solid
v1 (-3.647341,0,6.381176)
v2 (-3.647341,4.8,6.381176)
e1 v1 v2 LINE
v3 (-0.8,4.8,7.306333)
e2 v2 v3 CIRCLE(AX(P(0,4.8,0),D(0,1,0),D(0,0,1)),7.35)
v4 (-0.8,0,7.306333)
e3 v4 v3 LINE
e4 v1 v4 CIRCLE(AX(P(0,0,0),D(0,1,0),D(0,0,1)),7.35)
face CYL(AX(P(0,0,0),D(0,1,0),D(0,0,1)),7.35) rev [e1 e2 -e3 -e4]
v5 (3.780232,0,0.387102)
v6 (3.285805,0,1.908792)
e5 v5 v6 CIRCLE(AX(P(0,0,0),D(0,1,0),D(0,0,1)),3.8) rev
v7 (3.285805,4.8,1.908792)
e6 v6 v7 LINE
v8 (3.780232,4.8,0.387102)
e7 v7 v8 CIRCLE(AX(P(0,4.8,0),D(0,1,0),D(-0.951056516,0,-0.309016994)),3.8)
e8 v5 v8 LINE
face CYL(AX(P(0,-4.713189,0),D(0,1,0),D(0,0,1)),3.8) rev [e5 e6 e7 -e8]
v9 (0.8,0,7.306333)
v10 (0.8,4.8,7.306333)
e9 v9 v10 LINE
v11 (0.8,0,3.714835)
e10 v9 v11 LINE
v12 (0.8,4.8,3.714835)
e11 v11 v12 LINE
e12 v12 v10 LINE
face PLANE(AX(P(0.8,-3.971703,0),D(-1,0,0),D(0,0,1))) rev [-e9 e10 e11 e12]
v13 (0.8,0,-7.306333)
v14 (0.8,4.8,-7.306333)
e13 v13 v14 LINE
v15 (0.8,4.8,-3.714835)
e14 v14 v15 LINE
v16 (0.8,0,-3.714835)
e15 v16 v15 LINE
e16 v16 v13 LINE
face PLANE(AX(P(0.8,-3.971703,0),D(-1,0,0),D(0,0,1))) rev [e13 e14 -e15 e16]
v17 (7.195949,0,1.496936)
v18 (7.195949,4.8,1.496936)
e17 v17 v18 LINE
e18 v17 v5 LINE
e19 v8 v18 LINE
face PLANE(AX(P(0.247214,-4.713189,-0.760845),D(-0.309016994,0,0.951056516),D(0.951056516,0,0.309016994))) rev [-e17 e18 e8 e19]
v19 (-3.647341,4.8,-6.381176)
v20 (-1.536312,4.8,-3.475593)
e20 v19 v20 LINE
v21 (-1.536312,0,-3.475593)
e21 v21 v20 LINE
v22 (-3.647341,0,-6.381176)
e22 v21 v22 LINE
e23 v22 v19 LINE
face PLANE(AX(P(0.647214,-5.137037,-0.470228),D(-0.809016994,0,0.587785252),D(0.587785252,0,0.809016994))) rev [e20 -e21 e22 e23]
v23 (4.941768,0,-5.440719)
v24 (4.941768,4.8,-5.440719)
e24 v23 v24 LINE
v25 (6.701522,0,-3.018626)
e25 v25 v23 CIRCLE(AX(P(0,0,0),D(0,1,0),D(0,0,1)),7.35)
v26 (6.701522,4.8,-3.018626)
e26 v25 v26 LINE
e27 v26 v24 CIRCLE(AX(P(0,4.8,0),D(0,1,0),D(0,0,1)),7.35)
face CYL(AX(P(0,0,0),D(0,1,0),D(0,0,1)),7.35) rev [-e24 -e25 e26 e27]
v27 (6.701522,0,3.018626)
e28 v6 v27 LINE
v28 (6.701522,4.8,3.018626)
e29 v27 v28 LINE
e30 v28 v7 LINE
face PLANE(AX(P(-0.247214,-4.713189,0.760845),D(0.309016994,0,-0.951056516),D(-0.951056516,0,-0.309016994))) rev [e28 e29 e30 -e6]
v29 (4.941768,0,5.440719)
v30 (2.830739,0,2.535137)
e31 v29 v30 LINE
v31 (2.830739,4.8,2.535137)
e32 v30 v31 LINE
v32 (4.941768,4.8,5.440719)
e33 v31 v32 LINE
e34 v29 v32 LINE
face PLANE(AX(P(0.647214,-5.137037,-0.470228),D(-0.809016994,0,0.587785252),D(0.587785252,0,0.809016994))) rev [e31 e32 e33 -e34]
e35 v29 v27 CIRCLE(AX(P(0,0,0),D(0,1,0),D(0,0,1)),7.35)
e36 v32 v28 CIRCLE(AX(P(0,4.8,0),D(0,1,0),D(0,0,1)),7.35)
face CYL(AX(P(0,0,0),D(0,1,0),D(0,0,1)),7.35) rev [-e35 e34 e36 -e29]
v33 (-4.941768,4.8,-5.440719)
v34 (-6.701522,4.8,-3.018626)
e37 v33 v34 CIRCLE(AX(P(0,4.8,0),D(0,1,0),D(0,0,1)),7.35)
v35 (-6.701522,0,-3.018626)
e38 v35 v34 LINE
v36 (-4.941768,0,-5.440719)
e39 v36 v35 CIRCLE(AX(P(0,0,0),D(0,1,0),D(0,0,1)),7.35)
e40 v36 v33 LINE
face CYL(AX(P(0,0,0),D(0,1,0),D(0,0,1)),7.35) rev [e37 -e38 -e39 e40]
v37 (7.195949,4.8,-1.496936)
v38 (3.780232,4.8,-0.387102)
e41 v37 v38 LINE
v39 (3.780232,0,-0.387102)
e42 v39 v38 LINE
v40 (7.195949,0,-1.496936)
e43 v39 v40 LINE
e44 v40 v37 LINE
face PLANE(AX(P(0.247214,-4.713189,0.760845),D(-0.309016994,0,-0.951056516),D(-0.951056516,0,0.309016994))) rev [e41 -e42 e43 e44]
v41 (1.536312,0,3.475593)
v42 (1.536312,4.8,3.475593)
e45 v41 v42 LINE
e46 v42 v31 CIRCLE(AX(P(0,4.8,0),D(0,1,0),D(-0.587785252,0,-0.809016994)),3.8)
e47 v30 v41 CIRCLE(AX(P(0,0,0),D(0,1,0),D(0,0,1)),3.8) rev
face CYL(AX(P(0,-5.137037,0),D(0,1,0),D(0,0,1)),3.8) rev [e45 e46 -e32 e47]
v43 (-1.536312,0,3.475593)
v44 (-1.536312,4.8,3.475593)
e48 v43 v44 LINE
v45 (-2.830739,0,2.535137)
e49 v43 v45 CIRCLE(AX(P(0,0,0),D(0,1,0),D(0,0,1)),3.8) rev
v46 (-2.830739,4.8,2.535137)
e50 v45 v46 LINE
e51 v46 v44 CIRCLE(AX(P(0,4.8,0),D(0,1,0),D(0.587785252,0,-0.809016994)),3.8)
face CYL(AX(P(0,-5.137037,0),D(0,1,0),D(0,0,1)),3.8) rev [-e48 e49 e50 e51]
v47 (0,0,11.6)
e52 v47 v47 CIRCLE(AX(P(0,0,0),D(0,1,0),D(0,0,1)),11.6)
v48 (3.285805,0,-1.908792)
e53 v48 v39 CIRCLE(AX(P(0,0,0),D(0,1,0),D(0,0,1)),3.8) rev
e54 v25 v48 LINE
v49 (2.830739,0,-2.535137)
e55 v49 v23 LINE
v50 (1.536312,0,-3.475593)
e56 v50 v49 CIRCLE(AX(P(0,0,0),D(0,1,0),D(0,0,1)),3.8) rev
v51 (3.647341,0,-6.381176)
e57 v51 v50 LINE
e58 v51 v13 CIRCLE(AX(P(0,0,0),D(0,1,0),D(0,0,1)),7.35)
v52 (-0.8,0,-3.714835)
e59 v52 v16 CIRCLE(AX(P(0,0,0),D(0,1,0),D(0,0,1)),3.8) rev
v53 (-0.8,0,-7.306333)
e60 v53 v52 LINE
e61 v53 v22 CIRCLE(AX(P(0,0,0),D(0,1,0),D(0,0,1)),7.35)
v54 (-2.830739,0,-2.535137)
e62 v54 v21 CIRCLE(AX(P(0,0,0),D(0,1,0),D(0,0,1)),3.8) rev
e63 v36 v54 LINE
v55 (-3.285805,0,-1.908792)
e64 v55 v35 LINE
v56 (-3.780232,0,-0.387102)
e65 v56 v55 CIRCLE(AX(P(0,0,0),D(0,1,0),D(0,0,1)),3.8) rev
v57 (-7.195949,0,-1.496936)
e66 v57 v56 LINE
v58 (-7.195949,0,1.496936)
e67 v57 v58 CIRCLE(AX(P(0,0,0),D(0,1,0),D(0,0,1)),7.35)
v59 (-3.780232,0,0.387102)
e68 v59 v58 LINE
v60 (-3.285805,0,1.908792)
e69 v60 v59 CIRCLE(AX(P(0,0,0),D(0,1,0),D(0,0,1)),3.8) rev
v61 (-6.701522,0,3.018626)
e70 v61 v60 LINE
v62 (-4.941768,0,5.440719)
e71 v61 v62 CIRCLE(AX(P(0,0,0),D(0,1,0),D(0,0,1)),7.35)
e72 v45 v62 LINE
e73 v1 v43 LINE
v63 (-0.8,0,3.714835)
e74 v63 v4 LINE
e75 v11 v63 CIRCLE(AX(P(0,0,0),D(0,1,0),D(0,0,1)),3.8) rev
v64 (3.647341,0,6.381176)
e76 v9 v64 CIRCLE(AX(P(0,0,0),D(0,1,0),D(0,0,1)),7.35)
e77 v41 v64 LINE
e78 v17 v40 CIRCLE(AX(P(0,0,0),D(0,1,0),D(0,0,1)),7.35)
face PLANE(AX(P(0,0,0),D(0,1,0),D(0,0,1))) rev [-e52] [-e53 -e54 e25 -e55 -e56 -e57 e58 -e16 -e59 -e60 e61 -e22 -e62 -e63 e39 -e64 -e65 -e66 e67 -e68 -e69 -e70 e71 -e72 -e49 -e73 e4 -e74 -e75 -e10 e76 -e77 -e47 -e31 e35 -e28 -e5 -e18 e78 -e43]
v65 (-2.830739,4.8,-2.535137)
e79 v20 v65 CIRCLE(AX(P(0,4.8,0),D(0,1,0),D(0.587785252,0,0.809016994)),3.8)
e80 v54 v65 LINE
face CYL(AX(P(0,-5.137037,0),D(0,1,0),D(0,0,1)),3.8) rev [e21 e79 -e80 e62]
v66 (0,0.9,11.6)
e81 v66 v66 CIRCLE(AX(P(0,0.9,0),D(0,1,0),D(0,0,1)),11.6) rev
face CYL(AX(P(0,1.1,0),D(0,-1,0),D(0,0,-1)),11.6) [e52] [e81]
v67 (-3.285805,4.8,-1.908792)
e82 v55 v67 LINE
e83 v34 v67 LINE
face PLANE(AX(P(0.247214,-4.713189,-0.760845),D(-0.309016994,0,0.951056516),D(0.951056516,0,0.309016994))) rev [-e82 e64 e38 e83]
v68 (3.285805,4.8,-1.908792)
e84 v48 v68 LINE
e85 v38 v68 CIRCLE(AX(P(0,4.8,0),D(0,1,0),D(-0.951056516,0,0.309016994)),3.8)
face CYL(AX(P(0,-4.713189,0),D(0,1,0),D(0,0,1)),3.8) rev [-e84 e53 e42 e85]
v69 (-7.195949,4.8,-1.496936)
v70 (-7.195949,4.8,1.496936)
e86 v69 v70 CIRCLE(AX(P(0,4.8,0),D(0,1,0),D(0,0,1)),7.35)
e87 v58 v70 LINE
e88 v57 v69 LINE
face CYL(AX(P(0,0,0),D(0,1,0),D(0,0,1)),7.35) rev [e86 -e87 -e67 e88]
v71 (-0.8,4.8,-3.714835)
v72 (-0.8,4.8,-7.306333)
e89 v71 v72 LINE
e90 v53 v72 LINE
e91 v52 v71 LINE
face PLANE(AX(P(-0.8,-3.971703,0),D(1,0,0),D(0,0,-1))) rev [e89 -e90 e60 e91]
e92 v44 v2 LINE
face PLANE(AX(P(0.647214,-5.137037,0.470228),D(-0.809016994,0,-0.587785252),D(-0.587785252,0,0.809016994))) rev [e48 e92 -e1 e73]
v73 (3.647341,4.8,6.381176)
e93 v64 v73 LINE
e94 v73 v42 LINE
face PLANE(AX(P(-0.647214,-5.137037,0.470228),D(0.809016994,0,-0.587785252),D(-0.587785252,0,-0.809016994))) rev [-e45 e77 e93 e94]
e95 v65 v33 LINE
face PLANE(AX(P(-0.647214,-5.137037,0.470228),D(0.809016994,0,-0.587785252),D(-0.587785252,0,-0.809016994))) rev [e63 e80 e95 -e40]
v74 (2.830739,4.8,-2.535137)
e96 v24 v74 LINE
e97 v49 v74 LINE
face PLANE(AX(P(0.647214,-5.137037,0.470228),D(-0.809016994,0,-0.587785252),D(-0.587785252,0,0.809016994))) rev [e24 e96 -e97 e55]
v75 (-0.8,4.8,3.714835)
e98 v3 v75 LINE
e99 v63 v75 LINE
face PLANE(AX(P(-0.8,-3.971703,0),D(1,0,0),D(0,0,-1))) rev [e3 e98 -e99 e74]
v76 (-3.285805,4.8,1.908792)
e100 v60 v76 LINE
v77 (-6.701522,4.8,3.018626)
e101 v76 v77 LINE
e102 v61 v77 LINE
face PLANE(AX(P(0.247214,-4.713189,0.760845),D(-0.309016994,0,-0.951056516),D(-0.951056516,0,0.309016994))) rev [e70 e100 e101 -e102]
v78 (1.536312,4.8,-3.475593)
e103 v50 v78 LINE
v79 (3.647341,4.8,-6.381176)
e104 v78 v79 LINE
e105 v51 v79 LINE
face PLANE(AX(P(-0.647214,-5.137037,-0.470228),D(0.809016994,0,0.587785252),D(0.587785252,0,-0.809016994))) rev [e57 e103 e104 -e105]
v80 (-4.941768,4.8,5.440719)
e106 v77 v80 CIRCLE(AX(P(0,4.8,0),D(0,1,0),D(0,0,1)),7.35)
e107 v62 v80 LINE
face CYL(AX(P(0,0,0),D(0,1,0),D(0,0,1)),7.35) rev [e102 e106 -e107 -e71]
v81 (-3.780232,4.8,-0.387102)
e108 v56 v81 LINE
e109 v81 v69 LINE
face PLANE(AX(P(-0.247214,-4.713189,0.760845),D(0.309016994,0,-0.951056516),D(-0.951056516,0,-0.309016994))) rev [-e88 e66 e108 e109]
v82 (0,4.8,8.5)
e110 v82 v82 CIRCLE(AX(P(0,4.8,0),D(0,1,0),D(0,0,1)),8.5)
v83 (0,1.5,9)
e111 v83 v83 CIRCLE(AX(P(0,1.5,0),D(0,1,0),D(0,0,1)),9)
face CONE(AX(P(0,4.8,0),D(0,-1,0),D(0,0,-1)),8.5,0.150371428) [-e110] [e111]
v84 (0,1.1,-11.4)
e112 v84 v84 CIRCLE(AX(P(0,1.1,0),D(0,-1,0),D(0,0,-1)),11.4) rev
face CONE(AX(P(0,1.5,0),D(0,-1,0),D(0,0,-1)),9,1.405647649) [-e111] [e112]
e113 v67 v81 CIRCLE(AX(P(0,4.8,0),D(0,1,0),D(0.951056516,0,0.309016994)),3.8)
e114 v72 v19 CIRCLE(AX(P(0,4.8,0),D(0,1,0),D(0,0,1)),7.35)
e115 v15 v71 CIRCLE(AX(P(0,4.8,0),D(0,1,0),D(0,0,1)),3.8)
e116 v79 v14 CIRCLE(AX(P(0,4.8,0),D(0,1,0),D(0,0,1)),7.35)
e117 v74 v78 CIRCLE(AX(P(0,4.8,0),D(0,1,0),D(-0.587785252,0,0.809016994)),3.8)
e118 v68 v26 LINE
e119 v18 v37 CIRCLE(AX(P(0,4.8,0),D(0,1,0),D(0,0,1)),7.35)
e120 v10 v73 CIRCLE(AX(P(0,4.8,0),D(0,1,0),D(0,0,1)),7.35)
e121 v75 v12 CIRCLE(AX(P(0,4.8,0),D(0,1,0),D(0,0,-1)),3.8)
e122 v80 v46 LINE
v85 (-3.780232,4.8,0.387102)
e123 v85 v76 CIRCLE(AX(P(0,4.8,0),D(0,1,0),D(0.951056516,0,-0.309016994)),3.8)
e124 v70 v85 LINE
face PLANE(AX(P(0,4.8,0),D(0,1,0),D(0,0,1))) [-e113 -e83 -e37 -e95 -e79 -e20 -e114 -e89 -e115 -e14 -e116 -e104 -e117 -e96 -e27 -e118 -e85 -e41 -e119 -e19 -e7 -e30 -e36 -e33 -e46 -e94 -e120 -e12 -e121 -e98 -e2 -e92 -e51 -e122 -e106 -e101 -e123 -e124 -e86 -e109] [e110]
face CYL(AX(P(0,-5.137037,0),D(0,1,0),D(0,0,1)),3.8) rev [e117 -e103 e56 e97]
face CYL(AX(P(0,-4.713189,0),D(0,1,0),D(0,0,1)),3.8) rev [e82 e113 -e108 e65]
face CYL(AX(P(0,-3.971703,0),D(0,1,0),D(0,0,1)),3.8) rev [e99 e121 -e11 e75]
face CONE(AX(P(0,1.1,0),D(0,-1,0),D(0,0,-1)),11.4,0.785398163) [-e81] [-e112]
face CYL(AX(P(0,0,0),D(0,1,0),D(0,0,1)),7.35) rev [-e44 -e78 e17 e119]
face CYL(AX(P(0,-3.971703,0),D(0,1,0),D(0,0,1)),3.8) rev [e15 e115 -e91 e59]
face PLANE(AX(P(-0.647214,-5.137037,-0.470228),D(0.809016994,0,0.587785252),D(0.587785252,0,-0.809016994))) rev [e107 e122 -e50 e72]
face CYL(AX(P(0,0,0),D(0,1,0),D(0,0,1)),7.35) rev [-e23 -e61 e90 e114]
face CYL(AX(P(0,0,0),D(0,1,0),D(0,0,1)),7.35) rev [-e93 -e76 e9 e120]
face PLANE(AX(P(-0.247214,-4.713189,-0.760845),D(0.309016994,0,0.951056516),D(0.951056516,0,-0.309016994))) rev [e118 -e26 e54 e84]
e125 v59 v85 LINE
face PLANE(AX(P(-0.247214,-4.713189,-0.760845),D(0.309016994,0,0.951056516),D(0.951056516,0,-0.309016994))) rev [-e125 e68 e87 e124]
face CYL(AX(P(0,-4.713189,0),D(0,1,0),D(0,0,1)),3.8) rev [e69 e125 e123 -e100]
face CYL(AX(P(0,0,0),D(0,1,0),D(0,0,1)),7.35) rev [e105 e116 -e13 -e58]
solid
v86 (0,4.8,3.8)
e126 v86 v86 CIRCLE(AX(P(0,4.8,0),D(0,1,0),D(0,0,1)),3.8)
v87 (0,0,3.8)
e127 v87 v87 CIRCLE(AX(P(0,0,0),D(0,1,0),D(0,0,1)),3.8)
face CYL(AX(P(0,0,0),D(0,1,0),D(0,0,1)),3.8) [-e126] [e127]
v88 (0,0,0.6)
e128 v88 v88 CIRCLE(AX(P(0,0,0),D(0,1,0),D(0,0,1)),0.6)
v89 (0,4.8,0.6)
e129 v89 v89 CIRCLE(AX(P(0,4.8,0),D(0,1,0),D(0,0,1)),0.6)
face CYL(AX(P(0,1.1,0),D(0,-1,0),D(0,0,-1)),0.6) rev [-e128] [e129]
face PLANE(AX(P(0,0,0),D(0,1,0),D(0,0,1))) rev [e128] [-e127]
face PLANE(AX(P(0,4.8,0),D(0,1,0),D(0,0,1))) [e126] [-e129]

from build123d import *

# Parameters (mm, degrees)
SKETCH_4_R               = 11.6
SKETCH_4_R_2             = 0.6
EXTRUDE_1_DEPTH          = 1.1
EXTRUDE_START            = 1.5
SKETCH_4_3_R             = 9
SKETCH_4_3_R_2           = 0.6
EXTRUDE_2_DEPTH          = 3.3
CHAMFER_1_SIZE           = 0.2
SKETCH_4_4_R             = 0.6
CUT_EXTRUDE_2_DEPTH      = 18.092688495
CHAMFER_2_SIZE           = 0.5
CHAMFER_2_SIZE_2         = 3.3
CUT_EXTRUDE_4_DEPTH      = 18.092688495
EXTRUDE_3_DEPTH          = 4.8
PATTERN_CIRCULAR_2_COUNT = 10


with BuildPart() as part:
    # 草图4 → 凸台-拉伸1 (new body)
    with BuildSketch(Plane(origin=(0, 0, 0), x_dir=(1, 0, 0), z_dir=(0, 1, 0))):
        with Locations(Location((0, 0, 0), (0, 0, 270))):
            Circle(SKETCH_4_R)
        with Locations(Location((0, 0, 0), (0, 0, 270))):
            Circle(SKETCH_4_R_2, mode=Mode.SUBTRACT)
    extrude(amount=EXTRUDE_1_DEPTH)

    # 倒角1
    chamfer_1_edges = [part.edges().sort_by_distance(p)[0] for p in [
        (0, 1.1, -11.6),
    ]]
    chamfer(chamfer_1_edges, length=CHAMFER_1_SIZE)


with BuildPart() as body_2:
    # 草图4<3> → 凸台-拉伸2 (new body)
    with BuildSketch(Plane(origin=(0, 0, 0), x_dir=(1, 0, 0), z_dir=(0, 1, 0)).offset(EXTRUDE_START)):
        with Locations(Location((0, 0, 0), (0, 0, 270))):
            Circle(SKETCH_4_3_R)
        with Locations(Location((0, 0, 0), (0, 0, 270))):
            Circle(SKETCH_4_3_R_2, mode=Mode.SUBTRACT)
    extrude(amount=EXTRUDE_2_DEPTH)


    add(part.part)  # loft_1 joins it to this body
    # loft up to a face of the part (loft_1)
    loft([Face(Wire([body_2.edges().sort_by_distance((-6.560717647, 1.5, -6.160923953))[0]])), Face(Wire([body_2.edges().sort_by_distance((8.310242353, 1.1, -7.803837008))[0]]))])

    # 草图4<4> → 切除-拉伸2 (cut, through all)
    with BuildSketch(Plane(origin=(0, 0, 0), x_dir=(1, 0, 0), z_dir=(0, 1, 0))):
        with Locations(Location((0, 0, 0), (0, 0, 270))):
            Circle(SKETCH_4_4_R)
    extrude(amount=CUT_EXTRUDE_2_DEPTH, mode=Mode.SUBTRACT)

    # 倒角2
    # the kernel refuses this chamfer: 3.3, 0.5 mm, written as the material it takes off along each edge
    with BuildSketch(Plane(origin=(0, 4.8, 0), x_dir=(0, 0, 1), z_dir=(-1, 0, 0))) as chamfer_2_piece_1:
        Polygon((9 - CHAMFER_2_SIZE, 0), (9, -CHAMFER_2_SIZE_2), (9, 0), align=None)
    revolve(axis=Axis((0, 4.8, 0), (0, 1, 0)), mode=Mode.SUBTRACT)

    # 草图5 → 切除-拉伸4 (cut, through all)
    with BuildSketch(Plane(origin=(0, 4.8, 0), x_dir=(1, 0, 0), z_dir=(0, 1, 0))):
        with BuildLine():
            ThreePointArc((3.8, 0), (-2.387467277, -2.9563491), (-0.8, 3.714835124))
            Line((-0.8, 3.714835124), (-0.8, 7.30633287))
            ThreePointArc((-0.8, 7.30633287), (-4.906246019, -5.47277352), (7.35, 0))
            ThreePointArc((7.35, 0), (5.47277352, 4.906246019), (0.8, 7.30633287))
            Line((0.8, 7.30633287), (0.8, 3.714835124))
            ThreePointArc((0.8, 3.714835124), (2.9563491, 2.387467277), (3.8, 0))
        make_face()
        with BuildLine():
            Line((-0.8, 7.30633287), (-0.8, 3.714835124))
            ThreePointArc((-0.8, 3.714835124), (-0.402260194, 3.778648798), (0, 3.8))
            Line((0, 3.8), (0, 7.35))
            ThreePointArc((0, 7.35), (-0.400595438, 7.339075098), (-0.8, 7.30633287))
        make_face()
        with BuildLine():
            Line((0, 7.35), (0, 3.8))
            ThreePointArc((0, 3.8), (0.402260194, 3.778648798), (0.8, 3.714835124))
            Line((0.8, 3.714835124), (0.8, 7.30633287))
            ThreePointArc((0.8, 7.30633287), (0.400595438, 7.339075098), (0, 7.35))
        make_face()
    extrude(amount=-CUT_EXTRUDE_4_DEPTH, mode=Mode.SUBTRACT)


with BuildPart() as cut_extrude_4_piece_1:
    # of the separate pieces the step leaves, piece 1, a body of its own (cut_extrude_4_pieces)
    add(body_2.part.solids().sort_by_distance((0, 0.9, 11.6))[0])

    # 草图5<4> → 凸台-拉伸3 (add)
    with BuildSketch(Plane(origin=(0, 4.8, 0), x_dir=(1, 0, 0), z_dir=(0, 1, 0))):
        with BuildLine():
            Line((0, 7.35), (0, 3.8))
            ThreePointArc((0, 3.8), (0.402260194, 3.778648798), (0.8, 3.714835124))
            Line((0.8, 3.714835124), (0.8, 7.30633287))
            ThreePointArc((0.8, 7.30633287), (0.400595438, 7.339075098), (0, 7.35))
        make_face()
        with BuildLine():
            Line((-0.8, 7.30633287), (-0.8, 3.714835124))
            ThreePointArc((-0.8, 3.714835124), (-0.402260194, 3.778648798), (0, 3.8))
            Line((0, 3.8), (0, 7.35))
            ThreePointArc((0, 7.35), (-0.400595438, 7.339075098), (-0.8, 7.30633287))
        make_face()
    extrude_3 = extrude(amount=-EXTRUDE_3_DEPTH)

    # 阵列(圆周)2: 凸台-拉伸3 ×10 about axis
    pattern_circular_2_axis = Axis((0, 0, 0), (0, 1, 0))
    for i in range(1, PATTERN_CIRCULAR_2_COUNT):
        add(extrude_3.rotate(pattern_circular_2_axis, i * 360 / PATTERN_CIRCULAR_2_COUNT))


with BuildPart() as cut_extrude_4_piece_2:
    # of the separate pieces the step leaves, piece 2, a body of its own (cut_extrude_4_pieces)
    add(body_2.part.solids().sort_by_distance((-0.8, 0, -3.714835124))[0])


solid = Compound([cut_extrude_4_piece_1.part, cut_extrude_4_piece_2.part])
